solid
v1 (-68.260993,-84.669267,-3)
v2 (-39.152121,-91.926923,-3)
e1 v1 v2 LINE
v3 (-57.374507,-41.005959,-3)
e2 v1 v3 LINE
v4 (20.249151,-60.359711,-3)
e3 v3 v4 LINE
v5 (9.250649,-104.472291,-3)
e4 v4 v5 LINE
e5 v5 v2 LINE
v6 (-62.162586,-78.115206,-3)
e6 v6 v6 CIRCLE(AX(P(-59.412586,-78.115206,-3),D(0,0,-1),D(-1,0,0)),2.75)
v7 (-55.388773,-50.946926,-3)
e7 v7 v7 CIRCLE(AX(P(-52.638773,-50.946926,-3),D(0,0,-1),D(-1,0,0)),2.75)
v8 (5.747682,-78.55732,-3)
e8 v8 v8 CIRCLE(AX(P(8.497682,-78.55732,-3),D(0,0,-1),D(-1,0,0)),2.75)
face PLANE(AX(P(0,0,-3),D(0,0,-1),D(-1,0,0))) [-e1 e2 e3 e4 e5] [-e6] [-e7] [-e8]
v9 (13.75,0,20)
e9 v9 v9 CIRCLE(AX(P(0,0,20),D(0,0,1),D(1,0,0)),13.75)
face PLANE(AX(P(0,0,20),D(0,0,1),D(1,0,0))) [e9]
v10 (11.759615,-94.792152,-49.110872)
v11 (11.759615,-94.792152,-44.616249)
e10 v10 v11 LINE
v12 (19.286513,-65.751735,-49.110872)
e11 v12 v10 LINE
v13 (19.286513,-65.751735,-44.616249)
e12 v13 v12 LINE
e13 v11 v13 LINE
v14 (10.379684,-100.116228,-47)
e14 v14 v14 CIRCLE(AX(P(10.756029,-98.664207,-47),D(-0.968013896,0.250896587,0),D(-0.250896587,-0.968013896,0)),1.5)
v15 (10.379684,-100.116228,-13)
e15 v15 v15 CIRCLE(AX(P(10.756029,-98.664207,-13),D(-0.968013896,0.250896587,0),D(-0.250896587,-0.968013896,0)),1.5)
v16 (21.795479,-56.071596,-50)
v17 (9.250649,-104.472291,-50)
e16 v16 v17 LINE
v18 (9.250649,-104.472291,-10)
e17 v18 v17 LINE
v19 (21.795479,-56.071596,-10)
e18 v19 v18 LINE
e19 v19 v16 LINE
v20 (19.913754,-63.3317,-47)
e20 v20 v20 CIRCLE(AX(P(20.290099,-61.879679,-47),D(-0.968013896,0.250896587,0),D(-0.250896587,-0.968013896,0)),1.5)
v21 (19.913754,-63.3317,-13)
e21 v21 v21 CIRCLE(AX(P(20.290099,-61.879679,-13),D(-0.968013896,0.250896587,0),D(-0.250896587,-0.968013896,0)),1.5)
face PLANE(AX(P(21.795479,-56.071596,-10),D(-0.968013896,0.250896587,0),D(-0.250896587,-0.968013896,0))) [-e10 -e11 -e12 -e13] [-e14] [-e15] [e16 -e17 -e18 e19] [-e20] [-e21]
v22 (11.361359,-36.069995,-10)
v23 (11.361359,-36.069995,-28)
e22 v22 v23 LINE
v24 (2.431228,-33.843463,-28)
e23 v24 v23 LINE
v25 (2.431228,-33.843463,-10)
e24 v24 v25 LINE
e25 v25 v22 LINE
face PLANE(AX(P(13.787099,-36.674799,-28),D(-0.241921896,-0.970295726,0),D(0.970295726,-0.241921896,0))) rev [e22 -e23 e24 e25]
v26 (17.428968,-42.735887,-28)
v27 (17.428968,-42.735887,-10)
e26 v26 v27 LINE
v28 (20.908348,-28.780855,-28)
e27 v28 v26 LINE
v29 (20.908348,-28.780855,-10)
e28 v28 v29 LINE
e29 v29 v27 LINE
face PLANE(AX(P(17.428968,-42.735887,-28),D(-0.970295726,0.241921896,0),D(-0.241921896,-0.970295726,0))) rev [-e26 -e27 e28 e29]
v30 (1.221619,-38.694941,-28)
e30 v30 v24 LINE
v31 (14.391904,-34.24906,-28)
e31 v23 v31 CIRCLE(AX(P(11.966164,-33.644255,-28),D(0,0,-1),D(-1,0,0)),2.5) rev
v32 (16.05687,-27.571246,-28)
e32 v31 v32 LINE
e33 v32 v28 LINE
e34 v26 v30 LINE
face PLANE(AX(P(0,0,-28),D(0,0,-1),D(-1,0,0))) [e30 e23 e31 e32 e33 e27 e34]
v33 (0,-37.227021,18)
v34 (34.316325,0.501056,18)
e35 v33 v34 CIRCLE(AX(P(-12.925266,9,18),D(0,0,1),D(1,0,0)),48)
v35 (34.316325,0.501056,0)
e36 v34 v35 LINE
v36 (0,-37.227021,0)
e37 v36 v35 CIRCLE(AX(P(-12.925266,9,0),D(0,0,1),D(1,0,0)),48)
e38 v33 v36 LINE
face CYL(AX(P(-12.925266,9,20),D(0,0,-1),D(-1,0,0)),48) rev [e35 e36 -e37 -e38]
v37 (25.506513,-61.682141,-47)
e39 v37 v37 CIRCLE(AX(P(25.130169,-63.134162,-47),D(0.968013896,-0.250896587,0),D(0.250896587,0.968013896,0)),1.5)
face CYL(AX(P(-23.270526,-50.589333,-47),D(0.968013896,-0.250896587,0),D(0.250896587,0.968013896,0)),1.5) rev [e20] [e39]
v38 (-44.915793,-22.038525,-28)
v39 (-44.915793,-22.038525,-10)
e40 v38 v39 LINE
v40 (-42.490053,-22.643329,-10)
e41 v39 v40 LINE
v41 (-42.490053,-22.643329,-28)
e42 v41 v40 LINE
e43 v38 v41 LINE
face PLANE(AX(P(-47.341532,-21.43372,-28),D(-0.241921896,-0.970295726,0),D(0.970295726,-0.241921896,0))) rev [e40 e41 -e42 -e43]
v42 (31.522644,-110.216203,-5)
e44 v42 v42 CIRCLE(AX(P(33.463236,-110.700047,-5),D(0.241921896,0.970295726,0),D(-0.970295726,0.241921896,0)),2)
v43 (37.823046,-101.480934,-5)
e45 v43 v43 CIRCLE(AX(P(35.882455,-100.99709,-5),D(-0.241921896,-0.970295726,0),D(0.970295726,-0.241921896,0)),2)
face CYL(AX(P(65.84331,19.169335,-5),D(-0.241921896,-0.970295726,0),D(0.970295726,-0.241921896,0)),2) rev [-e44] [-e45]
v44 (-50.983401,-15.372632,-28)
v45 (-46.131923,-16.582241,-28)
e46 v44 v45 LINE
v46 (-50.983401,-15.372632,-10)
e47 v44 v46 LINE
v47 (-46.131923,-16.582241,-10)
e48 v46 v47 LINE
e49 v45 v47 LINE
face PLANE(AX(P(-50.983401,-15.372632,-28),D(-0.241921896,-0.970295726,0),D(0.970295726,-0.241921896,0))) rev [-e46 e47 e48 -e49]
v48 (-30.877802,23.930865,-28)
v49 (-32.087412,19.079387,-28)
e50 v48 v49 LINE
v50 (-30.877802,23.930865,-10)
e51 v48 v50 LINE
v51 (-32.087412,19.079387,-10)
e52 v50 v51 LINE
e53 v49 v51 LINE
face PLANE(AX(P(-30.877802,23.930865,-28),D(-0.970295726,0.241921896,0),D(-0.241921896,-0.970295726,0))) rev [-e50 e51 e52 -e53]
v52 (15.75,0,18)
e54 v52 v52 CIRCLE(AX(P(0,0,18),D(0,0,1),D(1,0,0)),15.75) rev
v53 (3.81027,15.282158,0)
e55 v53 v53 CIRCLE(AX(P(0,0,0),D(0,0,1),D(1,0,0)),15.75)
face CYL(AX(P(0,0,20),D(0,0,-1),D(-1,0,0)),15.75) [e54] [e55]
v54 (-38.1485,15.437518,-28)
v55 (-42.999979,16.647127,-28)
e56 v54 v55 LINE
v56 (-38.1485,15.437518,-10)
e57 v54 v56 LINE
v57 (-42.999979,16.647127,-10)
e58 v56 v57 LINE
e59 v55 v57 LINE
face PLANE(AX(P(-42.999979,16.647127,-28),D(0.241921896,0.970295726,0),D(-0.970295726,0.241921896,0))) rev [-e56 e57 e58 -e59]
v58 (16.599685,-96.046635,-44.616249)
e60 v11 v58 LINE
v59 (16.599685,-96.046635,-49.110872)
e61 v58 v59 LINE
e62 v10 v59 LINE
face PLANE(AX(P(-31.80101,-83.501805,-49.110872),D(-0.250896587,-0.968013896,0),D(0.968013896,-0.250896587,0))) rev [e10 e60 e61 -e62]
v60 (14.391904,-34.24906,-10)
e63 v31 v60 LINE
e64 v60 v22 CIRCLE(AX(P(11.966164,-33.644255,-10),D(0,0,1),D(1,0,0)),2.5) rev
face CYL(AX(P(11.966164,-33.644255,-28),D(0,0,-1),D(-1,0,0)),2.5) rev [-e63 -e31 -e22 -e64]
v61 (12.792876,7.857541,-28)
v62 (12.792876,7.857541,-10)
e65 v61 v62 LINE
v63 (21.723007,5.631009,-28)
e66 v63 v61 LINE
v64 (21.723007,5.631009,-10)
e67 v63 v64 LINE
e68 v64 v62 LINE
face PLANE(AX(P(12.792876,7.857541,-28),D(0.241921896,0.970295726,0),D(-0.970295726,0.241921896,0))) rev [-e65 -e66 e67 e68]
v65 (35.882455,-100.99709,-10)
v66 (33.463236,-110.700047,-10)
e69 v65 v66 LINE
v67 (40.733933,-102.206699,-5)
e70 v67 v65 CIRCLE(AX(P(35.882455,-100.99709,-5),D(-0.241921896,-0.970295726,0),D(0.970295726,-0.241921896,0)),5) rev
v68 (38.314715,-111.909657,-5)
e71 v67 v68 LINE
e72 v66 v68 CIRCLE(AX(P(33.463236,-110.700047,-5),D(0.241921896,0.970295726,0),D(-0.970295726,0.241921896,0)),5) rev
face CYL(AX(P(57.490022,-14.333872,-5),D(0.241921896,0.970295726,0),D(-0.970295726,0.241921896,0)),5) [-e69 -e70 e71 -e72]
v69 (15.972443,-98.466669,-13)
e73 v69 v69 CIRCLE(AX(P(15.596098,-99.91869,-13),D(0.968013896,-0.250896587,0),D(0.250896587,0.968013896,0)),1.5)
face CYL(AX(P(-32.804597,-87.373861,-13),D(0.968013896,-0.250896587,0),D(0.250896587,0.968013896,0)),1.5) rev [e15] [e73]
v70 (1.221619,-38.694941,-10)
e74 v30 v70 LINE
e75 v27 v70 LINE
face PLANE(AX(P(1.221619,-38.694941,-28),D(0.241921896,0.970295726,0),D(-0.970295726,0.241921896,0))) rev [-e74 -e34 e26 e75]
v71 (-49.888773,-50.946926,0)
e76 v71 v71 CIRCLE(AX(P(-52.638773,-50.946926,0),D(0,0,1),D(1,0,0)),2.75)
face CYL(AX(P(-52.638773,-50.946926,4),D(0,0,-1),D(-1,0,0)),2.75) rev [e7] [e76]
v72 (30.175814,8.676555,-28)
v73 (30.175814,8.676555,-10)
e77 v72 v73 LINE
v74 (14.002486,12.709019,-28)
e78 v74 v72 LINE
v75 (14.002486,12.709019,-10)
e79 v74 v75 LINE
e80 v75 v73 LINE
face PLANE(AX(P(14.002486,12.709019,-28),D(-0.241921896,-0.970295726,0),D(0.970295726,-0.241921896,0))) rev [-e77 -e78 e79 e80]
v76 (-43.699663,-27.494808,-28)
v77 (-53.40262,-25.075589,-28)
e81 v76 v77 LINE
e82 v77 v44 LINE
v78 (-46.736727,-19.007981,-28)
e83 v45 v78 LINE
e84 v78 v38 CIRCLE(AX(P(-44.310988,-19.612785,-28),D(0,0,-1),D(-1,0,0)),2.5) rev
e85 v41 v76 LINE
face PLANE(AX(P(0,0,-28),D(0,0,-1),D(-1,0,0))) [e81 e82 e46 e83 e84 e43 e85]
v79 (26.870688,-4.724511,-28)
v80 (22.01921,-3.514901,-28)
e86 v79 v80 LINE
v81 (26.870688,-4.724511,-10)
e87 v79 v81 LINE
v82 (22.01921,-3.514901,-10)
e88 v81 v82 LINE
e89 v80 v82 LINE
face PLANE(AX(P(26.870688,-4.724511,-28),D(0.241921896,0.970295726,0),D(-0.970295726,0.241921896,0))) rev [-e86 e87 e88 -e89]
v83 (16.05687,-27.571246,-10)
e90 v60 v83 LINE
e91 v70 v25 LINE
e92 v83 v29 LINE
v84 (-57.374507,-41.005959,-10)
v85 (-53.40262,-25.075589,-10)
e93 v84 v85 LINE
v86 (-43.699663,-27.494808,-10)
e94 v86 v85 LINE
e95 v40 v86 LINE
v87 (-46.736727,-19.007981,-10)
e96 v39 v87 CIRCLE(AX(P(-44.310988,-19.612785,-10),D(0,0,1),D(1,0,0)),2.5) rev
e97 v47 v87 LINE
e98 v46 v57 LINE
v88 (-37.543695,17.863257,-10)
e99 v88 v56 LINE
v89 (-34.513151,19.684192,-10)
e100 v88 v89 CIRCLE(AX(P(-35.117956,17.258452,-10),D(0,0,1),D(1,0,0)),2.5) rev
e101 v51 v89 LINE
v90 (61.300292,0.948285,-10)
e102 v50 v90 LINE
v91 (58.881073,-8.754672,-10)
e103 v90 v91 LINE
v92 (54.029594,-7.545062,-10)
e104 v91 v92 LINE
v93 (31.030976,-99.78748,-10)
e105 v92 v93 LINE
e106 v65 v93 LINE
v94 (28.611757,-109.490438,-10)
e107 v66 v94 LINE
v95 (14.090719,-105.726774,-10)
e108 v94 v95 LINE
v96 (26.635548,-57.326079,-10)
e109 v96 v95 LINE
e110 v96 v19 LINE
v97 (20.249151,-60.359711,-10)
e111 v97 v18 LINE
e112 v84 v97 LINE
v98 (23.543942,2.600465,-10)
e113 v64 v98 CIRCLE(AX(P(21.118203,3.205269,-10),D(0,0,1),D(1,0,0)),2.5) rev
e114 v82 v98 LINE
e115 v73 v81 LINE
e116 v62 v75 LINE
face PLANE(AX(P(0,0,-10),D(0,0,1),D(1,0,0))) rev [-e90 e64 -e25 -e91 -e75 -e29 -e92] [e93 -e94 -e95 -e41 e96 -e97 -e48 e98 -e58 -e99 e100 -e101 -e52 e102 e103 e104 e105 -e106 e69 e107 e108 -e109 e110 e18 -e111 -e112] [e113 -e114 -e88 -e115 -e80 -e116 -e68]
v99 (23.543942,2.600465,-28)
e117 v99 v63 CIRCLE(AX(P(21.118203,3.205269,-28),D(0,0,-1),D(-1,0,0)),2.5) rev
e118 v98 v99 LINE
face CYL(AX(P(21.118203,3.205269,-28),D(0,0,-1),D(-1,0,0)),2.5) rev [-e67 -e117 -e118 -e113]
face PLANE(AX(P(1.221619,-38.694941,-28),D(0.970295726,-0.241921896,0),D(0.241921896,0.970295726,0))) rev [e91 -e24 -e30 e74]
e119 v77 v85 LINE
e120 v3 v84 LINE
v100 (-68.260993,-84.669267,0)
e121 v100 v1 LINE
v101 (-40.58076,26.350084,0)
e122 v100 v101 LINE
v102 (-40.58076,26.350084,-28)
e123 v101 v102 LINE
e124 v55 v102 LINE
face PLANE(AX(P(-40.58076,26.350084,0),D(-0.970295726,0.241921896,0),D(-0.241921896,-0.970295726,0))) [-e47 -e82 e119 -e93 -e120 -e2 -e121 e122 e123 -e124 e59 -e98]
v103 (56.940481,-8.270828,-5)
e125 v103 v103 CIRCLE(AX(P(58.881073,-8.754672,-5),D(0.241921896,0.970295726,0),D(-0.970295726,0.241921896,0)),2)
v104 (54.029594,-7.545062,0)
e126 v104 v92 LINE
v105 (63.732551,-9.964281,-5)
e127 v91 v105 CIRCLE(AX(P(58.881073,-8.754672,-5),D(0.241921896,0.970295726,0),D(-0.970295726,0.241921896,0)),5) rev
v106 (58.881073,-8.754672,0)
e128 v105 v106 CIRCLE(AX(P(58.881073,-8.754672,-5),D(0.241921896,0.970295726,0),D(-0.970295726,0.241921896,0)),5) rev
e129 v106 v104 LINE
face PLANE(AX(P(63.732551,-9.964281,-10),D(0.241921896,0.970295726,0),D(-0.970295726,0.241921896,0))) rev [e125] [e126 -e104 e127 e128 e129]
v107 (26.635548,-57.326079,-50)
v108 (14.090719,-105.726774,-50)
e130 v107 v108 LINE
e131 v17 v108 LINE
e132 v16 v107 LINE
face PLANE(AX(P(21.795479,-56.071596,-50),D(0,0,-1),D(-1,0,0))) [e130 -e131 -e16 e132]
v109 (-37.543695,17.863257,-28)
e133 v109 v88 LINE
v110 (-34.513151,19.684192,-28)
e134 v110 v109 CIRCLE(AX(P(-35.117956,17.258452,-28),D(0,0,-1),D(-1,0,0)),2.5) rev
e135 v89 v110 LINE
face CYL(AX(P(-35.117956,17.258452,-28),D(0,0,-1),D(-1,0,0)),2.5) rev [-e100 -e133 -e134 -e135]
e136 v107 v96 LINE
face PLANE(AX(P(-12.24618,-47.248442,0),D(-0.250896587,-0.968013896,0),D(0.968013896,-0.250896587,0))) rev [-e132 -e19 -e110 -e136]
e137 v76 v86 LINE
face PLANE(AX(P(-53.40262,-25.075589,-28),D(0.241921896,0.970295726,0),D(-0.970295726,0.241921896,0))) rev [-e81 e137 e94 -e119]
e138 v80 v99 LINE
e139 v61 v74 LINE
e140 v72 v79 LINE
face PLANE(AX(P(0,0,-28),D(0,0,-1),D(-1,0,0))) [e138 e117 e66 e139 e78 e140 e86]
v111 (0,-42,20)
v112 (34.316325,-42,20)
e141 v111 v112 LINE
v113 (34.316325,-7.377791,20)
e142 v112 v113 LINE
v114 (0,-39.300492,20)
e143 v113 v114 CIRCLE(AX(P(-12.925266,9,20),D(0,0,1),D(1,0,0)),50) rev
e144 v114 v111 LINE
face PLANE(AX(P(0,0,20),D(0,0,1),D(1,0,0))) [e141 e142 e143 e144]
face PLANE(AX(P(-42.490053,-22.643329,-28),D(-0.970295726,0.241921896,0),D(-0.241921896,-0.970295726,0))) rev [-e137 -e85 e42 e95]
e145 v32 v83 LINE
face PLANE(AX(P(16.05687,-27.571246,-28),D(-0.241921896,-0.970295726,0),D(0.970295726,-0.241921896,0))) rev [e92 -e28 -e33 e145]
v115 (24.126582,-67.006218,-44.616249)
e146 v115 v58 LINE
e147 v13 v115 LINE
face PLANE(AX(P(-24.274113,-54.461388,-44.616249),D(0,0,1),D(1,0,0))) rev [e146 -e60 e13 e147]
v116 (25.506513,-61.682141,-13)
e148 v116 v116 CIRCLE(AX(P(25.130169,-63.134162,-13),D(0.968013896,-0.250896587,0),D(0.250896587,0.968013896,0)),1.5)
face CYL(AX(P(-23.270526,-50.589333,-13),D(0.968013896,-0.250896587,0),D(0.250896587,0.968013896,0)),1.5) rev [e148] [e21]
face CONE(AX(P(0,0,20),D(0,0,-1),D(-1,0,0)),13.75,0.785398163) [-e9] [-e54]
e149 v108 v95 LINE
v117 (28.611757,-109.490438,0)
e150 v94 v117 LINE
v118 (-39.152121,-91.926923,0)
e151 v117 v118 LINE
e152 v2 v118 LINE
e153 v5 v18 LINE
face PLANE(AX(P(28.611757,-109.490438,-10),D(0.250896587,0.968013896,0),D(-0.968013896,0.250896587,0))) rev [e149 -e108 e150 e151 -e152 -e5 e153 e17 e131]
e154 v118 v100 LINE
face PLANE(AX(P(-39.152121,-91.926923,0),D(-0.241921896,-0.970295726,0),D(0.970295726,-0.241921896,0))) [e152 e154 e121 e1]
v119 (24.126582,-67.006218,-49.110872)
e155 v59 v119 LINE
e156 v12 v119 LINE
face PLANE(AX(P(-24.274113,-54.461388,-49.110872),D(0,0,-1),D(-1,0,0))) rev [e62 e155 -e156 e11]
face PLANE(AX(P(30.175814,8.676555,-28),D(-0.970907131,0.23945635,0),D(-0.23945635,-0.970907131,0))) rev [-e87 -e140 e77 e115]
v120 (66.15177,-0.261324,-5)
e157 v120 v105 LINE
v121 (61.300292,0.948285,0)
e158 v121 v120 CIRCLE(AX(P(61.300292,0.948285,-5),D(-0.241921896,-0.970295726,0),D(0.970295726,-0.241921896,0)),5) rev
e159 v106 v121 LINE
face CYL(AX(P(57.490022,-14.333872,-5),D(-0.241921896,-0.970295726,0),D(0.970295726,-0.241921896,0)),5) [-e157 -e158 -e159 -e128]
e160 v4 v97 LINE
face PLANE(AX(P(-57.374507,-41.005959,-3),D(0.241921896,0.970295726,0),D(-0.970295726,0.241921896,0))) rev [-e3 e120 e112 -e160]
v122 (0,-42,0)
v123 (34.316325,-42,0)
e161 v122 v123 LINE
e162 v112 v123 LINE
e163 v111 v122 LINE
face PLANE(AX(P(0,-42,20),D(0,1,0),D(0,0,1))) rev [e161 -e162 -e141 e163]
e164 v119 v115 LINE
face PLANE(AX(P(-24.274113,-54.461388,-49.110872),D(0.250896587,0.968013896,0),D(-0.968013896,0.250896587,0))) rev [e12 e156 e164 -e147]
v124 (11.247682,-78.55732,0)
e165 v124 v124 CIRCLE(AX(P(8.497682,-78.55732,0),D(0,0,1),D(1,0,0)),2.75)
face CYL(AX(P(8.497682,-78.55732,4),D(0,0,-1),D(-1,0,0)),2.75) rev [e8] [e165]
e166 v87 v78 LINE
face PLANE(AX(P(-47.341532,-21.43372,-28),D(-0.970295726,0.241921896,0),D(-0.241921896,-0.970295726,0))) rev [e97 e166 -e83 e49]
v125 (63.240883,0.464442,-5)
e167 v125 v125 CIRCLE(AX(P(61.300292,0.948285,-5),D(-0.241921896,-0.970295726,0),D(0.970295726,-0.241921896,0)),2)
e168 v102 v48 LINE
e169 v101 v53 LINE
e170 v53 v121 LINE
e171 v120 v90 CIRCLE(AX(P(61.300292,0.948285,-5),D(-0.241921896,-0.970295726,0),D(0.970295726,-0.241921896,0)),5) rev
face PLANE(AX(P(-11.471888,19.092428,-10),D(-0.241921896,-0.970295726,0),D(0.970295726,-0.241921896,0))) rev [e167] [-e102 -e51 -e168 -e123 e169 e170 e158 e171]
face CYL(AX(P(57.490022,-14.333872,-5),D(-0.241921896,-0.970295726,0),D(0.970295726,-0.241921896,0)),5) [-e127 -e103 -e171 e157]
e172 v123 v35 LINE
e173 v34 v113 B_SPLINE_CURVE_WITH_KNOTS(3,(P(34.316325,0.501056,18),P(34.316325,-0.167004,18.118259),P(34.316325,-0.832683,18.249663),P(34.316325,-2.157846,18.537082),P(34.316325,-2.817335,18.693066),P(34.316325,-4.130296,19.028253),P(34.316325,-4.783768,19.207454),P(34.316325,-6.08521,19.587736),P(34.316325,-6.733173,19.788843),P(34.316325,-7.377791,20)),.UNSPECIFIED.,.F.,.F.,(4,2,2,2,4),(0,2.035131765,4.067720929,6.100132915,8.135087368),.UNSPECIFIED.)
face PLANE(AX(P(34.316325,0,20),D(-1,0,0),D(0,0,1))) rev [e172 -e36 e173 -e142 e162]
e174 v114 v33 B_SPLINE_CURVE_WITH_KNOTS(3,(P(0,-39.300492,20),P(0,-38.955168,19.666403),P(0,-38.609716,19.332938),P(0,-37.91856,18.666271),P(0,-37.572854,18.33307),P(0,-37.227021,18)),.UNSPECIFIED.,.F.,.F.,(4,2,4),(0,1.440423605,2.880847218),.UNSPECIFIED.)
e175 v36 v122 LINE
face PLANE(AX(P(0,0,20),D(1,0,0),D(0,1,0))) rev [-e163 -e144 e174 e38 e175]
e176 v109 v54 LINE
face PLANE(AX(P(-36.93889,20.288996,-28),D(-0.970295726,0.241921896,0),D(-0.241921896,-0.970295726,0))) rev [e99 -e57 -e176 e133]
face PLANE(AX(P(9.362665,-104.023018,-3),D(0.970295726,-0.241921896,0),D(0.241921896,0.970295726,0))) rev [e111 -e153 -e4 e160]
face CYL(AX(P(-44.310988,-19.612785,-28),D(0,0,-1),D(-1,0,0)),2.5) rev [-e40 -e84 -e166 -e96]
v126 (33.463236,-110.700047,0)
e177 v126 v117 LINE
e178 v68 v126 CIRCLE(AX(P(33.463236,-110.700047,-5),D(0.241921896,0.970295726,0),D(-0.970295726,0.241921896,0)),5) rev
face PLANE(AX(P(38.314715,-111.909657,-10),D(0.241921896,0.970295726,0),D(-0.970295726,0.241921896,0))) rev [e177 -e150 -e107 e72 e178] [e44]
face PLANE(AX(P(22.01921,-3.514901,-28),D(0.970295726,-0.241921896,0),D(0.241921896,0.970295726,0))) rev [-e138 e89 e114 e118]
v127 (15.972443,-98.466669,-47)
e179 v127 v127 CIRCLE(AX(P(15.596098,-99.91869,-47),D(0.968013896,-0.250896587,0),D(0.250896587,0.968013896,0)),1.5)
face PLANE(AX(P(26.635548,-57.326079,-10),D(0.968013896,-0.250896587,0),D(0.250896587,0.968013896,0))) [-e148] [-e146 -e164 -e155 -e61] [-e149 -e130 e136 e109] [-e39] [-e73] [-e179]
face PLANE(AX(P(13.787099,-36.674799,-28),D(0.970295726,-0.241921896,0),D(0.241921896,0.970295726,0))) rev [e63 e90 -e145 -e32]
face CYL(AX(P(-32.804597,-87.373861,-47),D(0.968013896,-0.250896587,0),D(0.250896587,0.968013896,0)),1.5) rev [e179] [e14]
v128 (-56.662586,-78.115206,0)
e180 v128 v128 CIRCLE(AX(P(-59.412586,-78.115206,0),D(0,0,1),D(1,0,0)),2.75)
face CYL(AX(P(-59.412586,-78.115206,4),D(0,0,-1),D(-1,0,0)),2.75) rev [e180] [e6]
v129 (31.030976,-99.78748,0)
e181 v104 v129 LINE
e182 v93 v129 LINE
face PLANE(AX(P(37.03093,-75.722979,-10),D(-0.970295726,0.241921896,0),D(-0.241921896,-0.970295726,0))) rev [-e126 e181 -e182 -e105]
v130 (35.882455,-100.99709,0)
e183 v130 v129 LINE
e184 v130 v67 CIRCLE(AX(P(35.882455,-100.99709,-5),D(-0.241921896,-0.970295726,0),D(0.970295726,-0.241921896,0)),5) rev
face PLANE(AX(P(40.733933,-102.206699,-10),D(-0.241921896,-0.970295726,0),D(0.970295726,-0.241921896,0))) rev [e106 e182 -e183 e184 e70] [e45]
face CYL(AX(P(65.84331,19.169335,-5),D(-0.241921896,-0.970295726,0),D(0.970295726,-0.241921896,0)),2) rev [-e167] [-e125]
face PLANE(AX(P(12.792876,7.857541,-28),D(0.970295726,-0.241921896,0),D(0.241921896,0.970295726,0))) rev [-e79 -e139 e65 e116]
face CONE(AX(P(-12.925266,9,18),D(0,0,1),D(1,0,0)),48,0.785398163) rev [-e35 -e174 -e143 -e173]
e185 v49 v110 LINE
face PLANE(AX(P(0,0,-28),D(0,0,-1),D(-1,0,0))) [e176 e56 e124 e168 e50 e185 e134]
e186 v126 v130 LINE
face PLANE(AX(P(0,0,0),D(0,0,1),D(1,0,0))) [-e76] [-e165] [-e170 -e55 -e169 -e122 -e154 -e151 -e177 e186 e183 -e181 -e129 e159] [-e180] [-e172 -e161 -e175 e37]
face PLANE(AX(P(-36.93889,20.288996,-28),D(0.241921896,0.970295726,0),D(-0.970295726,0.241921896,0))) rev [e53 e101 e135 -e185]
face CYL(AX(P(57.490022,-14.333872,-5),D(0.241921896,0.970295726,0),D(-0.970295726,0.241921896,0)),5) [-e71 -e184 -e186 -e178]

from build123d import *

# Parameters (mm, degrees)
SKETCH_1_R               = 15.75
EXTRUDE_1_DEPTH          = 20
EXTRUDE_1_2_DEPTH        = 20
EXTRUDE_5_DEPTH          = 10
CHAMFER_3_SIZE           = 2
SKETCH_18_W              = 10
SKETCH_18_H              = 10
EXTRUDE_6_DEPTH          = 10
CUT_EXTRUDE_1_DEPTH      = 148.860951012
CUT_EXTRUDE_1_DEPTH_BACK = 148.860951012
SKETCH_19_R              = 2
FILLET_2_R               = 5
EXTRUDE_7_DEPTH          = 10
CUT_EXTRUDE_2_DEPTH      = 7
SKETCH_23_R              = 2.75
CUT_EXTRUDE_3_DEPTH      = 7
EXTRUDE_9_DEPTH          = 18
FILLET_3_R               = 2.5
SKETCH_28_W              = 5
SKETCH_28_H              = 40
EXTRUDE_10_DEPTH         = 50
SKETCH_29_R              = 1.5
SKETCH_29_W              = 30
SKETCH_29_H              = 4.494622667
CUT_EXTRUDE_4_DEPTH      = 50


with BuildPart() as part:
    # 스케치1 → 보스-돌출1 (new body)
    with BuildSketch(Plane(origin=(0, 0, 0), x_dir=(0, 1, 0), z_dir=(0, 0, 1))):
        with Locations(Location((0, 0, 0), (0, 0, 270))):
            Circle(SKETCH_1_R)
    extrude(amount=EXTRUDE_1_DEPTH)



with BuildPart() as body_2:
    # 스케치1 → Extrude 1 2 (new body)
    with BuildSketch(Plane(origin=(0, 0, 0), x_dir=(0, 1, 0), z_dir=(0, 0, 1))):
        with BuildLine():
            ThreePointArc((0.501055918, -34.316325355), (-23.297606239, -22.583389768), (-37.227021319, 0))
            Line((-37.227021319, 0), (-42, 0))
            Line((-42, 0), (-42, -34.316325355))
            Line((-42, -34.316325355), (0.501055918, -34.316325355))
        make_face()
    extrude(amount=EXTRUDE_1_2_DEPTH)


with BuildPart() as part_1:
    add(part.part)

    add(body_2.part)  # 보스-돌출5 merges body 2
    # 스케치17 → 보스-돌출5 (add)
    with BuildSketch(Plane(origin=(0, 0, 0), x_dir=(-1, 0, 0), z_dir=(0, 0, -1))):
        Polygon((-56.448813006, 2.157894853), (-37.030930328, -75.722978764), (-28.611757259, -109.490437583), (39.152120893, -91.926923446), (30.889770512, -58.788446072), (11.471887833, 19.092427545), align=None)
    extrude(amount=EXTRUDE_5_DEPTH)

    # 모따기3
    chamfer_3_edges = [part_1.edges().sort_by_distance(p)[0] for p in [
        (22.583389768, -23.297606239, 20),
        (-15.75, 0, 20),
    ]]
    chamfer(chamfer_3_edges, length=CHAMFER_3_SIZE)

    # 스케치18 → 보스-돌출6 (add)
    with BuildSketch(Plane(origin=(52.63854315, -13.124262836, 0), x_dir=(0.24192189559966906, 0.9702957262759961, 0), z_dir=(0.9702957262759961, -0.24192189559966906, 0))):
        with Locations((-94.316293102, -5)):
            Rectangle(SKETCH_18_W, SKETCH_18_H)
        with Locations((10.75, -5)):
            Rectangle(SKETCH_18_W, SKETCH_18_H)
    extrude(amount=EXTRUDE_6_DEPTH)

    # 스케치19 → 컷-돌출1 (cut, two sides: drawn at the far end of the back side and taken through both)
    with BuildSketch(Plane(origin=(-24.026785891, -96.366174746, 0), x_dir=(0.9702957262759961, -0.24192189559966903, 0), z_dir=(-0.24192189559966903, -0.9702957262759961, 0)).offset(-CUT_EXTRUDE_1_DEPTH_BACK)):
        with Locations((59.25, -5)):
            Circle(SKETCH_19_R)
    extrude(amount=CUT_EXTRUDE_1_DEPTH + CUT_EXTRUDE_1_DEPTH_BACK, mode=Mode.SUBTRACT)

    # 필렛2
    fillet_2_edges = [part_1.edges().sort_by_distance(p)[0] for p in [
        (64.942160791, -5.112802735, -10),
        (64.942160791, -5.112802735, 0),
        (39.524324, -107.058177907, -10),
        (39.524324, -107.058177907, 0),
    ]]
    fillet(fillet_2_edges, radius=FILLET_2_R - 0.0001)  # a hair under: the kernel refuses the full size

    # 스케치21 → 보스-돌출7 (add)
    with BuildSketch(Plane(origin=(0, 0, -10), x_dir=(1, 0, 0), z_dir=(0, 0, -1))):
        Polygon((-11.471887833, -19.092427545), (-39.152120893, 91.926923446), (-68.260992681, 84.669266578), (-40.580759621, -26.350084413), align=None)
    extrude(amount=-EXTRUDE_7_DEPTH)

    # 스케치22 → 컷-돌출2 (cut)
    with BuildSketch(Plane(origin=(0, 0, -10), x_dir=(1, 0, 0), z_dir=(0, 0, -1))):
        Polygon((-68.260992681, 84.669266578), (-57.374507379, 41.005958895), (20.249150723, 60.359710543), (9.362665421, 104.023018226), (4.374510381, 124.029415356), (-73.249147721, 104.675663708), align=None)
    extrude(amount=-CUT_EXTRUDE_2_DEPTH, mode=Mode.SUBTRACT)

    # 스케치23 → 컷-돌출3 (cut)
    with BuildSketch(Plane(origin=(0, 0, -3), x_dir=(1, 0, 0), z_dir=(0, 0, -1))):
        with Locations(Location((8.49768178, 78.557319663, 0), (0, 0, 180))):
            Circle(SKETCH_23_R)
        with Locations(Location((-52.638773407, 50.946925838, 0), (0, 0, 180))):
            Circle(SKETCH_23_R)
        with Locations(Location((-59.412586484, 78.115206174, 0), (0, 0, 180))):
            Circle(SKETCH_23_R)
    extrude(amount=-CUT_EXTRUDE_3_DEPTH, mode=Mode.SUBTRACT)

    # 스케치27 → 보스-돌출9 (add)
    with BuildSketch(Plane(origin=(0, 0, -10), x_dir=(1, 0, 0), z_dir=(0, 0, -1))):
        Polygon((-42.999978577, -16.64712715), (-38.148499946, -15.437517672), (-36.938890468, -20.288996303), (-32.087411837, -19.079386825), (-30.877802359, -23.930865457), (-40.580759621, -26.350084413), align=None)
        Polygon((-47.341531979, 21.433719927), (-42.490053347, 22.643329405), (-43.699662825, 27.494808036), (-53.402620088, 25.07558908), (-50.983401132, 15.372631817), (-46.131922501, 16.582241295), align=None)
        Polygon((1.221618851, 38.694941482), (17.42896793, 42.735887459), (20.908348254, 28.780855193), (16.056869623, 27.571245715), (13.787098777, 36.674799349), (2.431228329, 33.84346285), align=None)
        Polygon((26.870688445, 4.724510909), (22.019209813, 3.514901431), (24.148746591, -5.026204076), (12.792876144, -7.857540575), (14.002485622, -12.709019206), (30.175814481, -8.676555422), align=None)
    extrude(amount=EXTRUDE_9_DEPTH)

    # 필렛3
    fillet_3_edges = [part_1.edges().sort_by_distance(p)[0] for p in [
        (-36.938890468, 20.288996303, -19),
        (13.787098777, -36.674799349, -19),
        (24.148746591, 5.026204076, -19),
        (-47.341531979, -21.433719927, -19),
    ]]
    fillet(fillet_3_edges, radius=FILLET_3_R)

    # 스케치28 → 보스-돌출10 (add)
    with BuildSketch(Plane(origin=(-24.791009663, -95.649136326, 0), x_dir=(0.9680138959056901, -0.25089658693072686, 0), z_dir=(-0.25089658693072686, -0.9680138959056901, 0))):
        with Locations((37.666498149, -30)):
            Rectangle(SKETCH_28_W, SKETCH_28_H)
    extrude(amount=-EXTRUDE_10_DEPTH)

    # 스케치29 → 컷-돌출4 (cut)
    with BuildSketch(Plane(origin=(38.881728358, -10.077637295, 0), x_dir=(0.25089658693072686, 0.9680138959056901, 0), z_dir=(0.9680138959056901, -0.25089658693072686, 0))):
        with Locations((-54.809672806, -47)):
            Circle(SKETCH_29_R)
        with Locations((-92.809672806, -47)):
            Circle(SKETCH_29_R)
        with Locations((-92.809672806, -13)):
            Circle(SKETCH_29_R)
        with Locations((-54.809672806, -13)):
            Circle(SKETCH_29_R)
        with Locations((-73.809672806, -46.863560509)):
            Rectangle(SKETCH_29_W, SKETCH_29_H)
    extrude(amount=-CUT_EXTRUDE_4_DEPTH, mode=Mode.SUBTRACT)


solid = part_1.part
